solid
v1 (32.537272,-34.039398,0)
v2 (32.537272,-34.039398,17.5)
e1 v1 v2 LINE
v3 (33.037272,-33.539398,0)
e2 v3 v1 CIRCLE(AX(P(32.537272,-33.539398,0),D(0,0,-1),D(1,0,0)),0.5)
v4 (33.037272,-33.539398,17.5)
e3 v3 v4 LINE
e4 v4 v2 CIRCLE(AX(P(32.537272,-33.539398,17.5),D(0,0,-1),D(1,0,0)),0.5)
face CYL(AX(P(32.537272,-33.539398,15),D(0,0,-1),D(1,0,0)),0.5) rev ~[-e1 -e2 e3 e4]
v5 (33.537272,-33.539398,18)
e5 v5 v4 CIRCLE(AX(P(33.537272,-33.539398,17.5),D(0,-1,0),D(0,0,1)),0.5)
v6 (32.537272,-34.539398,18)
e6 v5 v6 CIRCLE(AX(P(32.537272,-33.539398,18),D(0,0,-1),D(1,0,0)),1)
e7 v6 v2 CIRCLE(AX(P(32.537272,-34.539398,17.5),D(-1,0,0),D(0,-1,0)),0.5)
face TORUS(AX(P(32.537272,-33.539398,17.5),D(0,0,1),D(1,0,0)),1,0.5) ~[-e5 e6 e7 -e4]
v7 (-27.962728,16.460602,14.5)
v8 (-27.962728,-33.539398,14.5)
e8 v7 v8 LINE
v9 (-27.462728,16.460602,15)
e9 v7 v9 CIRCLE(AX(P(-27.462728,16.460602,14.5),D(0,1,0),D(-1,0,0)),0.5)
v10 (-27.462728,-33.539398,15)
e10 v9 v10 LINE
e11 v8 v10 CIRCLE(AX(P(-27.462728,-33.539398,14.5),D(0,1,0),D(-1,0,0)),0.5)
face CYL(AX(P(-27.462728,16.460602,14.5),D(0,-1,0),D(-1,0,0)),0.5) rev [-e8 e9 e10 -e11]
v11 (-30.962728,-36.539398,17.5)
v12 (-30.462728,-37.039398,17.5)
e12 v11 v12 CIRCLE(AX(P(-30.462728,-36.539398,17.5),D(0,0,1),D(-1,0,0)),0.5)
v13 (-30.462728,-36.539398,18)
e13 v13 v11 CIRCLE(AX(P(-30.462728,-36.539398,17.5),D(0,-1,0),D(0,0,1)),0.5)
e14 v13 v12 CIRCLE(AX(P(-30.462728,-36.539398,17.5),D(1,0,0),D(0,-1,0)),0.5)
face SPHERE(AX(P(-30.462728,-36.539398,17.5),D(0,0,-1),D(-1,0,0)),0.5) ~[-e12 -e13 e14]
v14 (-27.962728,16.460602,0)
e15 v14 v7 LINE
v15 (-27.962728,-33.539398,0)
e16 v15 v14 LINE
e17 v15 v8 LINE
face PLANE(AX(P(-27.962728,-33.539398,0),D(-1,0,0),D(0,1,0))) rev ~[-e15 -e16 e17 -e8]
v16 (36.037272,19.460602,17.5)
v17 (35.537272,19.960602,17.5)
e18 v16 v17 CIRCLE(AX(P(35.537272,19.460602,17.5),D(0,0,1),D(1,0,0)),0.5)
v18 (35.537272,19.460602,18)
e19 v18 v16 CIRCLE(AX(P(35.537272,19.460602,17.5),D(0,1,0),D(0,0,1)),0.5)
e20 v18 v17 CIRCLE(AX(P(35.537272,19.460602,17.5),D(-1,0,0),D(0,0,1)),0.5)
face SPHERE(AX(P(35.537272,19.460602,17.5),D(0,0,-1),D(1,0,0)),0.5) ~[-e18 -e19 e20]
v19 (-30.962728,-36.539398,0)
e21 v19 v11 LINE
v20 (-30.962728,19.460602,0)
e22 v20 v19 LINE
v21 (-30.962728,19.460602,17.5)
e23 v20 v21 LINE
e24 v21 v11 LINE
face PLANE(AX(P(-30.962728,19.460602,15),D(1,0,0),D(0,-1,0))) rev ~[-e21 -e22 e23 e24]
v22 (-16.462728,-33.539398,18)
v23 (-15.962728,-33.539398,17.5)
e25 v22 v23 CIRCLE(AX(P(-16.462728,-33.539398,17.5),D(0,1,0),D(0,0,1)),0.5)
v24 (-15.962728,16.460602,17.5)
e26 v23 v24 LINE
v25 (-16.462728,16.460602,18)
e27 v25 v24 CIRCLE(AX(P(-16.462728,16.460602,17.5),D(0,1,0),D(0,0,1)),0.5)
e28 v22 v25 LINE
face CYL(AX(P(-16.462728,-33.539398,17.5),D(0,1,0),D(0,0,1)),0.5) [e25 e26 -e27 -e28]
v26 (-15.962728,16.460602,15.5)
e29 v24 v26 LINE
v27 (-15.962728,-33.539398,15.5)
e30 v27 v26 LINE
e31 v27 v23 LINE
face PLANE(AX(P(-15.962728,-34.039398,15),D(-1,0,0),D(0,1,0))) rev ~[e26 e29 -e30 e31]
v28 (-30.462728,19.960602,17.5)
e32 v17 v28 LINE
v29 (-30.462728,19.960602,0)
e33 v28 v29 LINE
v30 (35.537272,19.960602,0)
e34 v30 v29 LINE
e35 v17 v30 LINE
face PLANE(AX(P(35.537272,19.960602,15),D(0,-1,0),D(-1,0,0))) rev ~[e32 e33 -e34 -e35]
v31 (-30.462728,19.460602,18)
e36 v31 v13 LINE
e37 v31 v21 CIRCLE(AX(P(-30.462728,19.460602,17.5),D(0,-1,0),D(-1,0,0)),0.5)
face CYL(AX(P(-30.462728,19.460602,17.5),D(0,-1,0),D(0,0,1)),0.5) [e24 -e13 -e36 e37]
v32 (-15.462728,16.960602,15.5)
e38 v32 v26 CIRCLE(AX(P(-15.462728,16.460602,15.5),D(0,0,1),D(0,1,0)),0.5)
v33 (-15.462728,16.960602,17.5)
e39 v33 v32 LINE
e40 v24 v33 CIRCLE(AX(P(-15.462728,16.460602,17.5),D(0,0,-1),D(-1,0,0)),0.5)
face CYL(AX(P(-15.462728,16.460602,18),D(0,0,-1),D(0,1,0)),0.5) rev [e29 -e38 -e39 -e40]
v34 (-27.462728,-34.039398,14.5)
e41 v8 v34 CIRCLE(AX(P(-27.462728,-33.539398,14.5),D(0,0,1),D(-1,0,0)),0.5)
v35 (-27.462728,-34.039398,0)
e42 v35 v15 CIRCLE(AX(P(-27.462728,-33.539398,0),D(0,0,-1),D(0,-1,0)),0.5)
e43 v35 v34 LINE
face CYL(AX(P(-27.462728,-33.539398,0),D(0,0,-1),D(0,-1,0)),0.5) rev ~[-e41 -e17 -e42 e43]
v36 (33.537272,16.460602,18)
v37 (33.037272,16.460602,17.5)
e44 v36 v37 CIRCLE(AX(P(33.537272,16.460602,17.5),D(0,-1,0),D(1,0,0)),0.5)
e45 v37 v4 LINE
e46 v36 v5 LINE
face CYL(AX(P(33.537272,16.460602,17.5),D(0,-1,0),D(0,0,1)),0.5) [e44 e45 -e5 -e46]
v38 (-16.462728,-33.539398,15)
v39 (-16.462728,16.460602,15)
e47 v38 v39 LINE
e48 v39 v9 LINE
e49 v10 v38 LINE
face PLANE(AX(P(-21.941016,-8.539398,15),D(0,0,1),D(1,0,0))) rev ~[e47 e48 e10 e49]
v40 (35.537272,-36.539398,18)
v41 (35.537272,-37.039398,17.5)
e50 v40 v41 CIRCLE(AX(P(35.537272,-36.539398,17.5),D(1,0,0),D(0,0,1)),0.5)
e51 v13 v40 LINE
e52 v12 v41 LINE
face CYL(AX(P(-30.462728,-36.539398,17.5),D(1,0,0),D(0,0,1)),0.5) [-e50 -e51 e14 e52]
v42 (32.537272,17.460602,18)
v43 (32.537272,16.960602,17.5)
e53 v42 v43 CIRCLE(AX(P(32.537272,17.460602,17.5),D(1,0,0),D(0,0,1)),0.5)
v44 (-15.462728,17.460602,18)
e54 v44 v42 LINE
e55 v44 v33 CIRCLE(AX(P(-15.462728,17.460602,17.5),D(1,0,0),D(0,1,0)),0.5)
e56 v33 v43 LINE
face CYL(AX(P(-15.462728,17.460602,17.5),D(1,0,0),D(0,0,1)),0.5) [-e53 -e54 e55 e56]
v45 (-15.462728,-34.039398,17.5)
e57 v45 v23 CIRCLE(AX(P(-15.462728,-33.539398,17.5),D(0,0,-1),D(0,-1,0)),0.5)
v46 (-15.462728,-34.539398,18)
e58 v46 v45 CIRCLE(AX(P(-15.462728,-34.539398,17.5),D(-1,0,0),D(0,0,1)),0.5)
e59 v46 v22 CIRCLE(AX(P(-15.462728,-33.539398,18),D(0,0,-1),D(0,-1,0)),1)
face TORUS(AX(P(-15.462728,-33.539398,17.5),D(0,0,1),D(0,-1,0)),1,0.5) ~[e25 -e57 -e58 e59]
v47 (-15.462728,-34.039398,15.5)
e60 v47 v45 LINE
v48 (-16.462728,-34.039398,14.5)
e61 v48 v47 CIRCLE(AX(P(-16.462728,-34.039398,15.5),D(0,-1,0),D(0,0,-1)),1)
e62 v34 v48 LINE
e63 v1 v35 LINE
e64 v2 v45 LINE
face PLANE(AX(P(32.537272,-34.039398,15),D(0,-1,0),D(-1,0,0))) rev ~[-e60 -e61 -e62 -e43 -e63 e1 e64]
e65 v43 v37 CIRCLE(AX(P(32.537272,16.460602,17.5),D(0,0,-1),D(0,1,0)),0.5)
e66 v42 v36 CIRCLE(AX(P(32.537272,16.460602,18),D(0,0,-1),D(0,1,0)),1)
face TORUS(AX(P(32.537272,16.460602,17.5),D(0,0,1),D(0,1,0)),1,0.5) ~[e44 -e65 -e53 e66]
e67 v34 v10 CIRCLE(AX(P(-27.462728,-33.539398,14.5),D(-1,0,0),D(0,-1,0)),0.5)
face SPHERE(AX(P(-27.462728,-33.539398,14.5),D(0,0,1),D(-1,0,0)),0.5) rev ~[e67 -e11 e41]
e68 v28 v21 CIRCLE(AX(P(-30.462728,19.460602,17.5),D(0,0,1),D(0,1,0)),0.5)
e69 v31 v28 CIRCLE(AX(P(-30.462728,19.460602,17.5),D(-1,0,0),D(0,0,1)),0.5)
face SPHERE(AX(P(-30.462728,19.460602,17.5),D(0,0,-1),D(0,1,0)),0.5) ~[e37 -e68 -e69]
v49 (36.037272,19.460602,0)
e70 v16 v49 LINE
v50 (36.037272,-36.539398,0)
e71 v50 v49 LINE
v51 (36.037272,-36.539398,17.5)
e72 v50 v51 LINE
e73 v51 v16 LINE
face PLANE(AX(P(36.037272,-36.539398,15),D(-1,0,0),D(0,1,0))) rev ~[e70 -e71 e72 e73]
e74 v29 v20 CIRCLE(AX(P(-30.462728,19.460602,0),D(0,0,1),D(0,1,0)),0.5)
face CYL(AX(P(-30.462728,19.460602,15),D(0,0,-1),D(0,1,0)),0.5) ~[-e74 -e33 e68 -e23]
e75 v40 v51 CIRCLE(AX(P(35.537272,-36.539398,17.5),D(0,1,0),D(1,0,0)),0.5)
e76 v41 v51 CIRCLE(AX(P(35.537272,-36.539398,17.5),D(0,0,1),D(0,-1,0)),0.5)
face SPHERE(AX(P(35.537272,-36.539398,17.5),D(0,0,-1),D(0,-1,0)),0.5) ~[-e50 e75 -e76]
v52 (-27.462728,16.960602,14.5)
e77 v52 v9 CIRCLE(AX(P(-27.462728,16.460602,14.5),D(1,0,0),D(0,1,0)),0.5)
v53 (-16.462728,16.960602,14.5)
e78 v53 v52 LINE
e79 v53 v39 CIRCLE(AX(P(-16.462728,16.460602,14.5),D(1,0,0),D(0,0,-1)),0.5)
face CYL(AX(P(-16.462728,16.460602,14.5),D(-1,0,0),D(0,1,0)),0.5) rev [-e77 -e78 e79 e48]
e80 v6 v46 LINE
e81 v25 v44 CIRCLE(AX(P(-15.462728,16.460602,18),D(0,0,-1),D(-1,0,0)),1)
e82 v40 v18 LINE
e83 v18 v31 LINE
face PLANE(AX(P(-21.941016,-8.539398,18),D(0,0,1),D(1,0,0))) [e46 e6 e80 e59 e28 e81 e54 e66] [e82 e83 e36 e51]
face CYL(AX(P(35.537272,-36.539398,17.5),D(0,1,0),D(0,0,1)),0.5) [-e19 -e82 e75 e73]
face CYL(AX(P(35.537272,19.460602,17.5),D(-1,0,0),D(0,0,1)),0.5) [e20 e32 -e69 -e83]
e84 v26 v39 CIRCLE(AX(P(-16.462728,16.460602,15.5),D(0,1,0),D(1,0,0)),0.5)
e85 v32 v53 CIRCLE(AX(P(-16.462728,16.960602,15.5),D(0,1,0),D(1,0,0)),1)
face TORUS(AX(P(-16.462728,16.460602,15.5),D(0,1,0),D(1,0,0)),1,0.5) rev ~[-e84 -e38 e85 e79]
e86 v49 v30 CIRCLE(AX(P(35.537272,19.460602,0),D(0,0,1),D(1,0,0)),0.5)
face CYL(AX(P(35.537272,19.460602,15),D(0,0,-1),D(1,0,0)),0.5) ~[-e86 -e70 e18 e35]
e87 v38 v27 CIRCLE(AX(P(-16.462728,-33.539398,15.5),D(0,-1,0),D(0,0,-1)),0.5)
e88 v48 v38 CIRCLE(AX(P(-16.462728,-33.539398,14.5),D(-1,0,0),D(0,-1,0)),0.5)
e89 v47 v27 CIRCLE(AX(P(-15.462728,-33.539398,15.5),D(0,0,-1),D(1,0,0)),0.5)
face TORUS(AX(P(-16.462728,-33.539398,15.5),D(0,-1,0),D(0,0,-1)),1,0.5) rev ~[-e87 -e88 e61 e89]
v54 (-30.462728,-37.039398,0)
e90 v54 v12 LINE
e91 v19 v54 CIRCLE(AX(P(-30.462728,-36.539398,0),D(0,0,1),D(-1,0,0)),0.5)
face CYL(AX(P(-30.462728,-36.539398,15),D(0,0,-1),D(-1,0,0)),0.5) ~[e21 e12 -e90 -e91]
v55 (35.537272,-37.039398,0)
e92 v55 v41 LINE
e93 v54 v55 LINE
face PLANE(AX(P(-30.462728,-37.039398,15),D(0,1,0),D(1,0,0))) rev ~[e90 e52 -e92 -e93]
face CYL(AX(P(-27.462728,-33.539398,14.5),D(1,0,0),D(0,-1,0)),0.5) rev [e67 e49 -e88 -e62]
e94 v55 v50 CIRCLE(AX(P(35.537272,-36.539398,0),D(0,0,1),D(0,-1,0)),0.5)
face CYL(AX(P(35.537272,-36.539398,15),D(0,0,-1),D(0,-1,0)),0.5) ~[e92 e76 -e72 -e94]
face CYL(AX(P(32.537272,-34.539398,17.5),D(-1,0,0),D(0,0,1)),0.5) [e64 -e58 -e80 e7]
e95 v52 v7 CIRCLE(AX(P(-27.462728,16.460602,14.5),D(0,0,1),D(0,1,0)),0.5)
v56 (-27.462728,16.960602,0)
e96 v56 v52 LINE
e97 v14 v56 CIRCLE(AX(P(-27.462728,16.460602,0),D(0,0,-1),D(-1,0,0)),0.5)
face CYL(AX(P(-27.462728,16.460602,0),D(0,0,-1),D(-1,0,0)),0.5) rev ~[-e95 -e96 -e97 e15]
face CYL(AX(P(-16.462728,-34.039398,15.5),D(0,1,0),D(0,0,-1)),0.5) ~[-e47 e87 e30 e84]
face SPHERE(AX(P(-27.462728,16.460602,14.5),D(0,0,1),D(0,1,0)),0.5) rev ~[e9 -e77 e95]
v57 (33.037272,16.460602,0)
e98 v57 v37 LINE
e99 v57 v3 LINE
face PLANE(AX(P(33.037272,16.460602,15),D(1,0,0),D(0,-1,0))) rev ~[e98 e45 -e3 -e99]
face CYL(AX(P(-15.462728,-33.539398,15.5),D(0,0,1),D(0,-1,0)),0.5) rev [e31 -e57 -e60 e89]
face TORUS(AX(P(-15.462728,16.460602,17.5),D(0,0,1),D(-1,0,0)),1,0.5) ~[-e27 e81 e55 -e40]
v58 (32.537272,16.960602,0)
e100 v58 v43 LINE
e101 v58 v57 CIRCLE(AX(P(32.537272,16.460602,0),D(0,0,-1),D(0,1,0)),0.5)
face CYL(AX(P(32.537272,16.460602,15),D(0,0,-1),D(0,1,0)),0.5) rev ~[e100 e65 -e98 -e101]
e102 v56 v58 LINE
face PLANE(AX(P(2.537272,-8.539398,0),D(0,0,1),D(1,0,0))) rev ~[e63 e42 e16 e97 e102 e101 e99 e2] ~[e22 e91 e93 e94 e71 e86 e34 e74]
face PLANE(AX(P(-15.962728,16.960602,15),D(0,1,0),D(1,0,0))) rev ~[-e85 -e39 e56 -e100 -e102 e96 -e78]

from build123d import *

# Parameters (mm, degrees)
F1_DEPTH = 15
F3_DEPTH = 3
F4_F1_R  = 0.5
F4_F2_R  = 0.5
F4_F3_R  = 0.5
F4_F4_R  = 0.5


with BuildPart() as f1:
    # F0 (on Top) → F1 (new body)
    with BuildSketch(Plane.XY):
        with BuildLine():
            Line((35.5372718227, 19.9606023237), (-30.4627281773, 19.9606023237))
            ThreePointArc((-30.4627281773, 19.9606023237), (-30.8162815679, 19.8141557143), (-30.9627281773, 19.4606023237))
            Line((-30.9627281773, 19.4606023237), (-30.9627281773, -36.5393976763))
            ThreePointArc((-30.9627281773, -36.5393976763), (-30.8162815679, -36.8929510669), (-30.4627281773, -37.0393976763))
            Line((-30.4627281773, -37.0393976763), (35.5372718227, -37.0393976763))
            ThreePointArc((35.5372718227, -37.0393976763), (35.8908252133, -36.8929510669), (36.0372718227, -36.5393976763))
            Line((36.0372718227, -36.5393976763), (36.0372718227, 19.4606023237))
            ThreePointArc((36.0372718227, 19.4606023237), (35.8908252133, 19.8141557143), (35.5372718227, 19.9606023237))
        make_face()
        with BuildLine():
            ThreePointArc((-27.9627281773, 16.4606023237), (-27.8162815679, 16.8141557143), (-27.4627281773, 16.9606023237))
            Line((-27.4627281773, 16.9606023237), (32.5372718227, 16.9606023237))
            ThreePointArc((32.5372718227, 16.9606023237), (32.8908252133, 16.8141557143), (33.0372718227, 16.4606023237))
            Line((33.0372718227, 16.4606023237), (33.0372718227, -33.5393976763))
            ThreePointArc((33.0372718227, -33.5393976763), (32.8908252133, -33.8929510669), (32.5372718227, -34.0393976763))
            Line((32.5372718227, -34.0393976763), (-27.4627281773, -34.0393976763))
            ThreePointArc((-27.4627281773, -34.0393976763), (-27.8162815679, -33.8929510669), (-27.9627281773, -33.5393976763))
            Line((-27.9627281773, -33.5393976763), (-27.9627281773, 16.4606023237))
        make_face(mode=Mode.SUBTRACT)
    extrude(amount=F1_DEPTH)

    # F2 (on face) → F3 (join)
    with BuildSketch(Plane.XY.offset(15)):
        with BuildLine():
            Line((-15.9627281773, -34.0393976763), (-15.9627281773, 16.9606023237))
            Line((-15.9627281773, 16.9606023237), (-27.4627281773, 16.9606023237))
            ThreePointArc((-27.4627281773, 16.9606023237), (-27.8162815679, 16.8141557143), (-27.9627281773, 16.4606023237))
            Line((-27.9627281773, 16.4606023237), (-27.9627281773, -33.5393976763))
            ThreePointArc((-27.9627281773, -33.5393976763), (-27.8162815679, -33.8929510669), (-27.4627281773, -34.0393976763))
            Line((-27.4627281773, -34.0393976763), (-15.9627281773, -34.0393976763))
        make_face()
        with BuildLine():
            ThreePointArc((-30.4627281773, 19.9606023237), (-30.8162815679, 19.8141557143), (-30.9627281773, 19.4606023237))
            Line((-30.9627281773, 19.4606023237), (-30.9627281773, -36.5393976763))
            ThreePointArc((-30.9627281773, -36.5393976763), (-30.8162815679, -36.8929510669), (-30.4627281773, -37.0393976763))
            Line((-30.4627281773, -37.0393976763), (-15.9627281773, -37.0393976763))
            Line((-15.9627281773, -37.0393976763), (-15.9627281773, -34.0393976763))
            Line((-15.9627281773, -34.0393976763), (-27.4627281773, -34.0393976763))
            ThreePointArc((-27.4627281773, -34.0393976763), (-27.8162815679, -33.8929510669), (-27.9627281773, -33.5393976763))
            Line((-27.9627281773, -33.5393976763), (-27.9627281773, 16.4606023237))
            ThreePointArc((-27.9627281773, 16.4606023237), (-27.8162815679, 16.8141557143), (-27.4627281773, 16.9606023237))
            Line((-27.4627281773, 16.9606023237), (-15.9627281773, 16.9606023237))
            Line((-15.9627281773, 16.9606023237), (-15.9627281773, 19.9606023237))
            Line((-15.9627281773, 19.9606023237), (-30.4627281773, 19.9606023237))
        make_face()
        with BuildLine():
            Line((35.5372718227, 19.9606023237), (-15.9627281773, 19.9606023237))
            Line((-15.9627281773, 19.9606023237), (-15.9627281773, 16.9606023237))
            Line((-15.9627281773, 16.9606023237), (32.5372718227, 16.9606023237))
            ThreePointArc((32.5372718227, 16.9606023237), (32.8908252133, 16.8141557143), (33.0372718227, 16.4606023237))
            Line((33.0372718227, 16.4606023237), (33.0372718227, -33.5393976763))
            ThreePointArc((33.0372718227, -33.5393976763), (32.8908252133, -33.8929510669), (32.5372718227, -34.0393976763))
            Line((32.5372718227, -34.0393976763), (-15.9627281773, -34.0393976763))
            Line((-15.9627281773, -34.0393976763), (-15.9627281773, -37.0393976763))
            Line((-15.9627281773, -37.0393976763), (35.5372718227, -37.0393976763))
            ThreePointArc((35.5372718227, -37.0393976763), (35.8908252133, -36.8929510669), (36.0372718227, -36.5393976763))
            Line((36.0372718227, -36.5393976763), (36.0372718227, 19.4606023237))
            ThreePointArc((36.0372718227, 19.4606023237), (35.8908252133, 19.8141557143), (35.5372718227, 19.9606023237))
        make_face()
    extrude(amount=F3_DEPTH)

    # F4: fillet of radius 0.5 on 7 edges, made by hand

    # F4_f1
    f4_f1_edges = [f1.edges().sort_by_distance(p)[0] for p in [
        (2.5372718227, 19.9606023237, 18),
        (36.0372718227, -8.5393976763, 18),
        (35.8908252133, -36.8929510669, 18),
        (2.5372718227, -37.0393976763, 18),
        (-30.8162815679, -36.8929510669, 18),
        (-30.9627281773, -8.5393976763, 18),
        (-30.8162815679, 19.8141557143, 18),
        (35.8908252133, 19.8141557143, 18),
    ]]
    fillet(f4_f1_edges, radius=F4_F1_R)

    # F4_f2
    f4_f2_edges = [f1.edges().sort_by_distance(p)[0] for p in [
        (-15.9627281773, -8.5393976763, 15),
    ]]
    fillet(f4_f2_edges, radius=F4_F2_R)

    # F4_f3
    f4_f3_edges = [f1.edges().sort_by_distance(p)[0] for p in [
        (-15.9627281773, -34.0393976763, 16.75),
    ]]
    fillet(f4_f3_edges, radius=F4_F3_R)

    # F4_f4
    f4_f4_edges = [f1.edges().sort_by_distance(p)[0] for p in [
        (-15.9627281773, -8.5393976763, 18),
    ]]
    fillet(f4_f4_edges, radius=F4_F4_R)


solid = f1.part
